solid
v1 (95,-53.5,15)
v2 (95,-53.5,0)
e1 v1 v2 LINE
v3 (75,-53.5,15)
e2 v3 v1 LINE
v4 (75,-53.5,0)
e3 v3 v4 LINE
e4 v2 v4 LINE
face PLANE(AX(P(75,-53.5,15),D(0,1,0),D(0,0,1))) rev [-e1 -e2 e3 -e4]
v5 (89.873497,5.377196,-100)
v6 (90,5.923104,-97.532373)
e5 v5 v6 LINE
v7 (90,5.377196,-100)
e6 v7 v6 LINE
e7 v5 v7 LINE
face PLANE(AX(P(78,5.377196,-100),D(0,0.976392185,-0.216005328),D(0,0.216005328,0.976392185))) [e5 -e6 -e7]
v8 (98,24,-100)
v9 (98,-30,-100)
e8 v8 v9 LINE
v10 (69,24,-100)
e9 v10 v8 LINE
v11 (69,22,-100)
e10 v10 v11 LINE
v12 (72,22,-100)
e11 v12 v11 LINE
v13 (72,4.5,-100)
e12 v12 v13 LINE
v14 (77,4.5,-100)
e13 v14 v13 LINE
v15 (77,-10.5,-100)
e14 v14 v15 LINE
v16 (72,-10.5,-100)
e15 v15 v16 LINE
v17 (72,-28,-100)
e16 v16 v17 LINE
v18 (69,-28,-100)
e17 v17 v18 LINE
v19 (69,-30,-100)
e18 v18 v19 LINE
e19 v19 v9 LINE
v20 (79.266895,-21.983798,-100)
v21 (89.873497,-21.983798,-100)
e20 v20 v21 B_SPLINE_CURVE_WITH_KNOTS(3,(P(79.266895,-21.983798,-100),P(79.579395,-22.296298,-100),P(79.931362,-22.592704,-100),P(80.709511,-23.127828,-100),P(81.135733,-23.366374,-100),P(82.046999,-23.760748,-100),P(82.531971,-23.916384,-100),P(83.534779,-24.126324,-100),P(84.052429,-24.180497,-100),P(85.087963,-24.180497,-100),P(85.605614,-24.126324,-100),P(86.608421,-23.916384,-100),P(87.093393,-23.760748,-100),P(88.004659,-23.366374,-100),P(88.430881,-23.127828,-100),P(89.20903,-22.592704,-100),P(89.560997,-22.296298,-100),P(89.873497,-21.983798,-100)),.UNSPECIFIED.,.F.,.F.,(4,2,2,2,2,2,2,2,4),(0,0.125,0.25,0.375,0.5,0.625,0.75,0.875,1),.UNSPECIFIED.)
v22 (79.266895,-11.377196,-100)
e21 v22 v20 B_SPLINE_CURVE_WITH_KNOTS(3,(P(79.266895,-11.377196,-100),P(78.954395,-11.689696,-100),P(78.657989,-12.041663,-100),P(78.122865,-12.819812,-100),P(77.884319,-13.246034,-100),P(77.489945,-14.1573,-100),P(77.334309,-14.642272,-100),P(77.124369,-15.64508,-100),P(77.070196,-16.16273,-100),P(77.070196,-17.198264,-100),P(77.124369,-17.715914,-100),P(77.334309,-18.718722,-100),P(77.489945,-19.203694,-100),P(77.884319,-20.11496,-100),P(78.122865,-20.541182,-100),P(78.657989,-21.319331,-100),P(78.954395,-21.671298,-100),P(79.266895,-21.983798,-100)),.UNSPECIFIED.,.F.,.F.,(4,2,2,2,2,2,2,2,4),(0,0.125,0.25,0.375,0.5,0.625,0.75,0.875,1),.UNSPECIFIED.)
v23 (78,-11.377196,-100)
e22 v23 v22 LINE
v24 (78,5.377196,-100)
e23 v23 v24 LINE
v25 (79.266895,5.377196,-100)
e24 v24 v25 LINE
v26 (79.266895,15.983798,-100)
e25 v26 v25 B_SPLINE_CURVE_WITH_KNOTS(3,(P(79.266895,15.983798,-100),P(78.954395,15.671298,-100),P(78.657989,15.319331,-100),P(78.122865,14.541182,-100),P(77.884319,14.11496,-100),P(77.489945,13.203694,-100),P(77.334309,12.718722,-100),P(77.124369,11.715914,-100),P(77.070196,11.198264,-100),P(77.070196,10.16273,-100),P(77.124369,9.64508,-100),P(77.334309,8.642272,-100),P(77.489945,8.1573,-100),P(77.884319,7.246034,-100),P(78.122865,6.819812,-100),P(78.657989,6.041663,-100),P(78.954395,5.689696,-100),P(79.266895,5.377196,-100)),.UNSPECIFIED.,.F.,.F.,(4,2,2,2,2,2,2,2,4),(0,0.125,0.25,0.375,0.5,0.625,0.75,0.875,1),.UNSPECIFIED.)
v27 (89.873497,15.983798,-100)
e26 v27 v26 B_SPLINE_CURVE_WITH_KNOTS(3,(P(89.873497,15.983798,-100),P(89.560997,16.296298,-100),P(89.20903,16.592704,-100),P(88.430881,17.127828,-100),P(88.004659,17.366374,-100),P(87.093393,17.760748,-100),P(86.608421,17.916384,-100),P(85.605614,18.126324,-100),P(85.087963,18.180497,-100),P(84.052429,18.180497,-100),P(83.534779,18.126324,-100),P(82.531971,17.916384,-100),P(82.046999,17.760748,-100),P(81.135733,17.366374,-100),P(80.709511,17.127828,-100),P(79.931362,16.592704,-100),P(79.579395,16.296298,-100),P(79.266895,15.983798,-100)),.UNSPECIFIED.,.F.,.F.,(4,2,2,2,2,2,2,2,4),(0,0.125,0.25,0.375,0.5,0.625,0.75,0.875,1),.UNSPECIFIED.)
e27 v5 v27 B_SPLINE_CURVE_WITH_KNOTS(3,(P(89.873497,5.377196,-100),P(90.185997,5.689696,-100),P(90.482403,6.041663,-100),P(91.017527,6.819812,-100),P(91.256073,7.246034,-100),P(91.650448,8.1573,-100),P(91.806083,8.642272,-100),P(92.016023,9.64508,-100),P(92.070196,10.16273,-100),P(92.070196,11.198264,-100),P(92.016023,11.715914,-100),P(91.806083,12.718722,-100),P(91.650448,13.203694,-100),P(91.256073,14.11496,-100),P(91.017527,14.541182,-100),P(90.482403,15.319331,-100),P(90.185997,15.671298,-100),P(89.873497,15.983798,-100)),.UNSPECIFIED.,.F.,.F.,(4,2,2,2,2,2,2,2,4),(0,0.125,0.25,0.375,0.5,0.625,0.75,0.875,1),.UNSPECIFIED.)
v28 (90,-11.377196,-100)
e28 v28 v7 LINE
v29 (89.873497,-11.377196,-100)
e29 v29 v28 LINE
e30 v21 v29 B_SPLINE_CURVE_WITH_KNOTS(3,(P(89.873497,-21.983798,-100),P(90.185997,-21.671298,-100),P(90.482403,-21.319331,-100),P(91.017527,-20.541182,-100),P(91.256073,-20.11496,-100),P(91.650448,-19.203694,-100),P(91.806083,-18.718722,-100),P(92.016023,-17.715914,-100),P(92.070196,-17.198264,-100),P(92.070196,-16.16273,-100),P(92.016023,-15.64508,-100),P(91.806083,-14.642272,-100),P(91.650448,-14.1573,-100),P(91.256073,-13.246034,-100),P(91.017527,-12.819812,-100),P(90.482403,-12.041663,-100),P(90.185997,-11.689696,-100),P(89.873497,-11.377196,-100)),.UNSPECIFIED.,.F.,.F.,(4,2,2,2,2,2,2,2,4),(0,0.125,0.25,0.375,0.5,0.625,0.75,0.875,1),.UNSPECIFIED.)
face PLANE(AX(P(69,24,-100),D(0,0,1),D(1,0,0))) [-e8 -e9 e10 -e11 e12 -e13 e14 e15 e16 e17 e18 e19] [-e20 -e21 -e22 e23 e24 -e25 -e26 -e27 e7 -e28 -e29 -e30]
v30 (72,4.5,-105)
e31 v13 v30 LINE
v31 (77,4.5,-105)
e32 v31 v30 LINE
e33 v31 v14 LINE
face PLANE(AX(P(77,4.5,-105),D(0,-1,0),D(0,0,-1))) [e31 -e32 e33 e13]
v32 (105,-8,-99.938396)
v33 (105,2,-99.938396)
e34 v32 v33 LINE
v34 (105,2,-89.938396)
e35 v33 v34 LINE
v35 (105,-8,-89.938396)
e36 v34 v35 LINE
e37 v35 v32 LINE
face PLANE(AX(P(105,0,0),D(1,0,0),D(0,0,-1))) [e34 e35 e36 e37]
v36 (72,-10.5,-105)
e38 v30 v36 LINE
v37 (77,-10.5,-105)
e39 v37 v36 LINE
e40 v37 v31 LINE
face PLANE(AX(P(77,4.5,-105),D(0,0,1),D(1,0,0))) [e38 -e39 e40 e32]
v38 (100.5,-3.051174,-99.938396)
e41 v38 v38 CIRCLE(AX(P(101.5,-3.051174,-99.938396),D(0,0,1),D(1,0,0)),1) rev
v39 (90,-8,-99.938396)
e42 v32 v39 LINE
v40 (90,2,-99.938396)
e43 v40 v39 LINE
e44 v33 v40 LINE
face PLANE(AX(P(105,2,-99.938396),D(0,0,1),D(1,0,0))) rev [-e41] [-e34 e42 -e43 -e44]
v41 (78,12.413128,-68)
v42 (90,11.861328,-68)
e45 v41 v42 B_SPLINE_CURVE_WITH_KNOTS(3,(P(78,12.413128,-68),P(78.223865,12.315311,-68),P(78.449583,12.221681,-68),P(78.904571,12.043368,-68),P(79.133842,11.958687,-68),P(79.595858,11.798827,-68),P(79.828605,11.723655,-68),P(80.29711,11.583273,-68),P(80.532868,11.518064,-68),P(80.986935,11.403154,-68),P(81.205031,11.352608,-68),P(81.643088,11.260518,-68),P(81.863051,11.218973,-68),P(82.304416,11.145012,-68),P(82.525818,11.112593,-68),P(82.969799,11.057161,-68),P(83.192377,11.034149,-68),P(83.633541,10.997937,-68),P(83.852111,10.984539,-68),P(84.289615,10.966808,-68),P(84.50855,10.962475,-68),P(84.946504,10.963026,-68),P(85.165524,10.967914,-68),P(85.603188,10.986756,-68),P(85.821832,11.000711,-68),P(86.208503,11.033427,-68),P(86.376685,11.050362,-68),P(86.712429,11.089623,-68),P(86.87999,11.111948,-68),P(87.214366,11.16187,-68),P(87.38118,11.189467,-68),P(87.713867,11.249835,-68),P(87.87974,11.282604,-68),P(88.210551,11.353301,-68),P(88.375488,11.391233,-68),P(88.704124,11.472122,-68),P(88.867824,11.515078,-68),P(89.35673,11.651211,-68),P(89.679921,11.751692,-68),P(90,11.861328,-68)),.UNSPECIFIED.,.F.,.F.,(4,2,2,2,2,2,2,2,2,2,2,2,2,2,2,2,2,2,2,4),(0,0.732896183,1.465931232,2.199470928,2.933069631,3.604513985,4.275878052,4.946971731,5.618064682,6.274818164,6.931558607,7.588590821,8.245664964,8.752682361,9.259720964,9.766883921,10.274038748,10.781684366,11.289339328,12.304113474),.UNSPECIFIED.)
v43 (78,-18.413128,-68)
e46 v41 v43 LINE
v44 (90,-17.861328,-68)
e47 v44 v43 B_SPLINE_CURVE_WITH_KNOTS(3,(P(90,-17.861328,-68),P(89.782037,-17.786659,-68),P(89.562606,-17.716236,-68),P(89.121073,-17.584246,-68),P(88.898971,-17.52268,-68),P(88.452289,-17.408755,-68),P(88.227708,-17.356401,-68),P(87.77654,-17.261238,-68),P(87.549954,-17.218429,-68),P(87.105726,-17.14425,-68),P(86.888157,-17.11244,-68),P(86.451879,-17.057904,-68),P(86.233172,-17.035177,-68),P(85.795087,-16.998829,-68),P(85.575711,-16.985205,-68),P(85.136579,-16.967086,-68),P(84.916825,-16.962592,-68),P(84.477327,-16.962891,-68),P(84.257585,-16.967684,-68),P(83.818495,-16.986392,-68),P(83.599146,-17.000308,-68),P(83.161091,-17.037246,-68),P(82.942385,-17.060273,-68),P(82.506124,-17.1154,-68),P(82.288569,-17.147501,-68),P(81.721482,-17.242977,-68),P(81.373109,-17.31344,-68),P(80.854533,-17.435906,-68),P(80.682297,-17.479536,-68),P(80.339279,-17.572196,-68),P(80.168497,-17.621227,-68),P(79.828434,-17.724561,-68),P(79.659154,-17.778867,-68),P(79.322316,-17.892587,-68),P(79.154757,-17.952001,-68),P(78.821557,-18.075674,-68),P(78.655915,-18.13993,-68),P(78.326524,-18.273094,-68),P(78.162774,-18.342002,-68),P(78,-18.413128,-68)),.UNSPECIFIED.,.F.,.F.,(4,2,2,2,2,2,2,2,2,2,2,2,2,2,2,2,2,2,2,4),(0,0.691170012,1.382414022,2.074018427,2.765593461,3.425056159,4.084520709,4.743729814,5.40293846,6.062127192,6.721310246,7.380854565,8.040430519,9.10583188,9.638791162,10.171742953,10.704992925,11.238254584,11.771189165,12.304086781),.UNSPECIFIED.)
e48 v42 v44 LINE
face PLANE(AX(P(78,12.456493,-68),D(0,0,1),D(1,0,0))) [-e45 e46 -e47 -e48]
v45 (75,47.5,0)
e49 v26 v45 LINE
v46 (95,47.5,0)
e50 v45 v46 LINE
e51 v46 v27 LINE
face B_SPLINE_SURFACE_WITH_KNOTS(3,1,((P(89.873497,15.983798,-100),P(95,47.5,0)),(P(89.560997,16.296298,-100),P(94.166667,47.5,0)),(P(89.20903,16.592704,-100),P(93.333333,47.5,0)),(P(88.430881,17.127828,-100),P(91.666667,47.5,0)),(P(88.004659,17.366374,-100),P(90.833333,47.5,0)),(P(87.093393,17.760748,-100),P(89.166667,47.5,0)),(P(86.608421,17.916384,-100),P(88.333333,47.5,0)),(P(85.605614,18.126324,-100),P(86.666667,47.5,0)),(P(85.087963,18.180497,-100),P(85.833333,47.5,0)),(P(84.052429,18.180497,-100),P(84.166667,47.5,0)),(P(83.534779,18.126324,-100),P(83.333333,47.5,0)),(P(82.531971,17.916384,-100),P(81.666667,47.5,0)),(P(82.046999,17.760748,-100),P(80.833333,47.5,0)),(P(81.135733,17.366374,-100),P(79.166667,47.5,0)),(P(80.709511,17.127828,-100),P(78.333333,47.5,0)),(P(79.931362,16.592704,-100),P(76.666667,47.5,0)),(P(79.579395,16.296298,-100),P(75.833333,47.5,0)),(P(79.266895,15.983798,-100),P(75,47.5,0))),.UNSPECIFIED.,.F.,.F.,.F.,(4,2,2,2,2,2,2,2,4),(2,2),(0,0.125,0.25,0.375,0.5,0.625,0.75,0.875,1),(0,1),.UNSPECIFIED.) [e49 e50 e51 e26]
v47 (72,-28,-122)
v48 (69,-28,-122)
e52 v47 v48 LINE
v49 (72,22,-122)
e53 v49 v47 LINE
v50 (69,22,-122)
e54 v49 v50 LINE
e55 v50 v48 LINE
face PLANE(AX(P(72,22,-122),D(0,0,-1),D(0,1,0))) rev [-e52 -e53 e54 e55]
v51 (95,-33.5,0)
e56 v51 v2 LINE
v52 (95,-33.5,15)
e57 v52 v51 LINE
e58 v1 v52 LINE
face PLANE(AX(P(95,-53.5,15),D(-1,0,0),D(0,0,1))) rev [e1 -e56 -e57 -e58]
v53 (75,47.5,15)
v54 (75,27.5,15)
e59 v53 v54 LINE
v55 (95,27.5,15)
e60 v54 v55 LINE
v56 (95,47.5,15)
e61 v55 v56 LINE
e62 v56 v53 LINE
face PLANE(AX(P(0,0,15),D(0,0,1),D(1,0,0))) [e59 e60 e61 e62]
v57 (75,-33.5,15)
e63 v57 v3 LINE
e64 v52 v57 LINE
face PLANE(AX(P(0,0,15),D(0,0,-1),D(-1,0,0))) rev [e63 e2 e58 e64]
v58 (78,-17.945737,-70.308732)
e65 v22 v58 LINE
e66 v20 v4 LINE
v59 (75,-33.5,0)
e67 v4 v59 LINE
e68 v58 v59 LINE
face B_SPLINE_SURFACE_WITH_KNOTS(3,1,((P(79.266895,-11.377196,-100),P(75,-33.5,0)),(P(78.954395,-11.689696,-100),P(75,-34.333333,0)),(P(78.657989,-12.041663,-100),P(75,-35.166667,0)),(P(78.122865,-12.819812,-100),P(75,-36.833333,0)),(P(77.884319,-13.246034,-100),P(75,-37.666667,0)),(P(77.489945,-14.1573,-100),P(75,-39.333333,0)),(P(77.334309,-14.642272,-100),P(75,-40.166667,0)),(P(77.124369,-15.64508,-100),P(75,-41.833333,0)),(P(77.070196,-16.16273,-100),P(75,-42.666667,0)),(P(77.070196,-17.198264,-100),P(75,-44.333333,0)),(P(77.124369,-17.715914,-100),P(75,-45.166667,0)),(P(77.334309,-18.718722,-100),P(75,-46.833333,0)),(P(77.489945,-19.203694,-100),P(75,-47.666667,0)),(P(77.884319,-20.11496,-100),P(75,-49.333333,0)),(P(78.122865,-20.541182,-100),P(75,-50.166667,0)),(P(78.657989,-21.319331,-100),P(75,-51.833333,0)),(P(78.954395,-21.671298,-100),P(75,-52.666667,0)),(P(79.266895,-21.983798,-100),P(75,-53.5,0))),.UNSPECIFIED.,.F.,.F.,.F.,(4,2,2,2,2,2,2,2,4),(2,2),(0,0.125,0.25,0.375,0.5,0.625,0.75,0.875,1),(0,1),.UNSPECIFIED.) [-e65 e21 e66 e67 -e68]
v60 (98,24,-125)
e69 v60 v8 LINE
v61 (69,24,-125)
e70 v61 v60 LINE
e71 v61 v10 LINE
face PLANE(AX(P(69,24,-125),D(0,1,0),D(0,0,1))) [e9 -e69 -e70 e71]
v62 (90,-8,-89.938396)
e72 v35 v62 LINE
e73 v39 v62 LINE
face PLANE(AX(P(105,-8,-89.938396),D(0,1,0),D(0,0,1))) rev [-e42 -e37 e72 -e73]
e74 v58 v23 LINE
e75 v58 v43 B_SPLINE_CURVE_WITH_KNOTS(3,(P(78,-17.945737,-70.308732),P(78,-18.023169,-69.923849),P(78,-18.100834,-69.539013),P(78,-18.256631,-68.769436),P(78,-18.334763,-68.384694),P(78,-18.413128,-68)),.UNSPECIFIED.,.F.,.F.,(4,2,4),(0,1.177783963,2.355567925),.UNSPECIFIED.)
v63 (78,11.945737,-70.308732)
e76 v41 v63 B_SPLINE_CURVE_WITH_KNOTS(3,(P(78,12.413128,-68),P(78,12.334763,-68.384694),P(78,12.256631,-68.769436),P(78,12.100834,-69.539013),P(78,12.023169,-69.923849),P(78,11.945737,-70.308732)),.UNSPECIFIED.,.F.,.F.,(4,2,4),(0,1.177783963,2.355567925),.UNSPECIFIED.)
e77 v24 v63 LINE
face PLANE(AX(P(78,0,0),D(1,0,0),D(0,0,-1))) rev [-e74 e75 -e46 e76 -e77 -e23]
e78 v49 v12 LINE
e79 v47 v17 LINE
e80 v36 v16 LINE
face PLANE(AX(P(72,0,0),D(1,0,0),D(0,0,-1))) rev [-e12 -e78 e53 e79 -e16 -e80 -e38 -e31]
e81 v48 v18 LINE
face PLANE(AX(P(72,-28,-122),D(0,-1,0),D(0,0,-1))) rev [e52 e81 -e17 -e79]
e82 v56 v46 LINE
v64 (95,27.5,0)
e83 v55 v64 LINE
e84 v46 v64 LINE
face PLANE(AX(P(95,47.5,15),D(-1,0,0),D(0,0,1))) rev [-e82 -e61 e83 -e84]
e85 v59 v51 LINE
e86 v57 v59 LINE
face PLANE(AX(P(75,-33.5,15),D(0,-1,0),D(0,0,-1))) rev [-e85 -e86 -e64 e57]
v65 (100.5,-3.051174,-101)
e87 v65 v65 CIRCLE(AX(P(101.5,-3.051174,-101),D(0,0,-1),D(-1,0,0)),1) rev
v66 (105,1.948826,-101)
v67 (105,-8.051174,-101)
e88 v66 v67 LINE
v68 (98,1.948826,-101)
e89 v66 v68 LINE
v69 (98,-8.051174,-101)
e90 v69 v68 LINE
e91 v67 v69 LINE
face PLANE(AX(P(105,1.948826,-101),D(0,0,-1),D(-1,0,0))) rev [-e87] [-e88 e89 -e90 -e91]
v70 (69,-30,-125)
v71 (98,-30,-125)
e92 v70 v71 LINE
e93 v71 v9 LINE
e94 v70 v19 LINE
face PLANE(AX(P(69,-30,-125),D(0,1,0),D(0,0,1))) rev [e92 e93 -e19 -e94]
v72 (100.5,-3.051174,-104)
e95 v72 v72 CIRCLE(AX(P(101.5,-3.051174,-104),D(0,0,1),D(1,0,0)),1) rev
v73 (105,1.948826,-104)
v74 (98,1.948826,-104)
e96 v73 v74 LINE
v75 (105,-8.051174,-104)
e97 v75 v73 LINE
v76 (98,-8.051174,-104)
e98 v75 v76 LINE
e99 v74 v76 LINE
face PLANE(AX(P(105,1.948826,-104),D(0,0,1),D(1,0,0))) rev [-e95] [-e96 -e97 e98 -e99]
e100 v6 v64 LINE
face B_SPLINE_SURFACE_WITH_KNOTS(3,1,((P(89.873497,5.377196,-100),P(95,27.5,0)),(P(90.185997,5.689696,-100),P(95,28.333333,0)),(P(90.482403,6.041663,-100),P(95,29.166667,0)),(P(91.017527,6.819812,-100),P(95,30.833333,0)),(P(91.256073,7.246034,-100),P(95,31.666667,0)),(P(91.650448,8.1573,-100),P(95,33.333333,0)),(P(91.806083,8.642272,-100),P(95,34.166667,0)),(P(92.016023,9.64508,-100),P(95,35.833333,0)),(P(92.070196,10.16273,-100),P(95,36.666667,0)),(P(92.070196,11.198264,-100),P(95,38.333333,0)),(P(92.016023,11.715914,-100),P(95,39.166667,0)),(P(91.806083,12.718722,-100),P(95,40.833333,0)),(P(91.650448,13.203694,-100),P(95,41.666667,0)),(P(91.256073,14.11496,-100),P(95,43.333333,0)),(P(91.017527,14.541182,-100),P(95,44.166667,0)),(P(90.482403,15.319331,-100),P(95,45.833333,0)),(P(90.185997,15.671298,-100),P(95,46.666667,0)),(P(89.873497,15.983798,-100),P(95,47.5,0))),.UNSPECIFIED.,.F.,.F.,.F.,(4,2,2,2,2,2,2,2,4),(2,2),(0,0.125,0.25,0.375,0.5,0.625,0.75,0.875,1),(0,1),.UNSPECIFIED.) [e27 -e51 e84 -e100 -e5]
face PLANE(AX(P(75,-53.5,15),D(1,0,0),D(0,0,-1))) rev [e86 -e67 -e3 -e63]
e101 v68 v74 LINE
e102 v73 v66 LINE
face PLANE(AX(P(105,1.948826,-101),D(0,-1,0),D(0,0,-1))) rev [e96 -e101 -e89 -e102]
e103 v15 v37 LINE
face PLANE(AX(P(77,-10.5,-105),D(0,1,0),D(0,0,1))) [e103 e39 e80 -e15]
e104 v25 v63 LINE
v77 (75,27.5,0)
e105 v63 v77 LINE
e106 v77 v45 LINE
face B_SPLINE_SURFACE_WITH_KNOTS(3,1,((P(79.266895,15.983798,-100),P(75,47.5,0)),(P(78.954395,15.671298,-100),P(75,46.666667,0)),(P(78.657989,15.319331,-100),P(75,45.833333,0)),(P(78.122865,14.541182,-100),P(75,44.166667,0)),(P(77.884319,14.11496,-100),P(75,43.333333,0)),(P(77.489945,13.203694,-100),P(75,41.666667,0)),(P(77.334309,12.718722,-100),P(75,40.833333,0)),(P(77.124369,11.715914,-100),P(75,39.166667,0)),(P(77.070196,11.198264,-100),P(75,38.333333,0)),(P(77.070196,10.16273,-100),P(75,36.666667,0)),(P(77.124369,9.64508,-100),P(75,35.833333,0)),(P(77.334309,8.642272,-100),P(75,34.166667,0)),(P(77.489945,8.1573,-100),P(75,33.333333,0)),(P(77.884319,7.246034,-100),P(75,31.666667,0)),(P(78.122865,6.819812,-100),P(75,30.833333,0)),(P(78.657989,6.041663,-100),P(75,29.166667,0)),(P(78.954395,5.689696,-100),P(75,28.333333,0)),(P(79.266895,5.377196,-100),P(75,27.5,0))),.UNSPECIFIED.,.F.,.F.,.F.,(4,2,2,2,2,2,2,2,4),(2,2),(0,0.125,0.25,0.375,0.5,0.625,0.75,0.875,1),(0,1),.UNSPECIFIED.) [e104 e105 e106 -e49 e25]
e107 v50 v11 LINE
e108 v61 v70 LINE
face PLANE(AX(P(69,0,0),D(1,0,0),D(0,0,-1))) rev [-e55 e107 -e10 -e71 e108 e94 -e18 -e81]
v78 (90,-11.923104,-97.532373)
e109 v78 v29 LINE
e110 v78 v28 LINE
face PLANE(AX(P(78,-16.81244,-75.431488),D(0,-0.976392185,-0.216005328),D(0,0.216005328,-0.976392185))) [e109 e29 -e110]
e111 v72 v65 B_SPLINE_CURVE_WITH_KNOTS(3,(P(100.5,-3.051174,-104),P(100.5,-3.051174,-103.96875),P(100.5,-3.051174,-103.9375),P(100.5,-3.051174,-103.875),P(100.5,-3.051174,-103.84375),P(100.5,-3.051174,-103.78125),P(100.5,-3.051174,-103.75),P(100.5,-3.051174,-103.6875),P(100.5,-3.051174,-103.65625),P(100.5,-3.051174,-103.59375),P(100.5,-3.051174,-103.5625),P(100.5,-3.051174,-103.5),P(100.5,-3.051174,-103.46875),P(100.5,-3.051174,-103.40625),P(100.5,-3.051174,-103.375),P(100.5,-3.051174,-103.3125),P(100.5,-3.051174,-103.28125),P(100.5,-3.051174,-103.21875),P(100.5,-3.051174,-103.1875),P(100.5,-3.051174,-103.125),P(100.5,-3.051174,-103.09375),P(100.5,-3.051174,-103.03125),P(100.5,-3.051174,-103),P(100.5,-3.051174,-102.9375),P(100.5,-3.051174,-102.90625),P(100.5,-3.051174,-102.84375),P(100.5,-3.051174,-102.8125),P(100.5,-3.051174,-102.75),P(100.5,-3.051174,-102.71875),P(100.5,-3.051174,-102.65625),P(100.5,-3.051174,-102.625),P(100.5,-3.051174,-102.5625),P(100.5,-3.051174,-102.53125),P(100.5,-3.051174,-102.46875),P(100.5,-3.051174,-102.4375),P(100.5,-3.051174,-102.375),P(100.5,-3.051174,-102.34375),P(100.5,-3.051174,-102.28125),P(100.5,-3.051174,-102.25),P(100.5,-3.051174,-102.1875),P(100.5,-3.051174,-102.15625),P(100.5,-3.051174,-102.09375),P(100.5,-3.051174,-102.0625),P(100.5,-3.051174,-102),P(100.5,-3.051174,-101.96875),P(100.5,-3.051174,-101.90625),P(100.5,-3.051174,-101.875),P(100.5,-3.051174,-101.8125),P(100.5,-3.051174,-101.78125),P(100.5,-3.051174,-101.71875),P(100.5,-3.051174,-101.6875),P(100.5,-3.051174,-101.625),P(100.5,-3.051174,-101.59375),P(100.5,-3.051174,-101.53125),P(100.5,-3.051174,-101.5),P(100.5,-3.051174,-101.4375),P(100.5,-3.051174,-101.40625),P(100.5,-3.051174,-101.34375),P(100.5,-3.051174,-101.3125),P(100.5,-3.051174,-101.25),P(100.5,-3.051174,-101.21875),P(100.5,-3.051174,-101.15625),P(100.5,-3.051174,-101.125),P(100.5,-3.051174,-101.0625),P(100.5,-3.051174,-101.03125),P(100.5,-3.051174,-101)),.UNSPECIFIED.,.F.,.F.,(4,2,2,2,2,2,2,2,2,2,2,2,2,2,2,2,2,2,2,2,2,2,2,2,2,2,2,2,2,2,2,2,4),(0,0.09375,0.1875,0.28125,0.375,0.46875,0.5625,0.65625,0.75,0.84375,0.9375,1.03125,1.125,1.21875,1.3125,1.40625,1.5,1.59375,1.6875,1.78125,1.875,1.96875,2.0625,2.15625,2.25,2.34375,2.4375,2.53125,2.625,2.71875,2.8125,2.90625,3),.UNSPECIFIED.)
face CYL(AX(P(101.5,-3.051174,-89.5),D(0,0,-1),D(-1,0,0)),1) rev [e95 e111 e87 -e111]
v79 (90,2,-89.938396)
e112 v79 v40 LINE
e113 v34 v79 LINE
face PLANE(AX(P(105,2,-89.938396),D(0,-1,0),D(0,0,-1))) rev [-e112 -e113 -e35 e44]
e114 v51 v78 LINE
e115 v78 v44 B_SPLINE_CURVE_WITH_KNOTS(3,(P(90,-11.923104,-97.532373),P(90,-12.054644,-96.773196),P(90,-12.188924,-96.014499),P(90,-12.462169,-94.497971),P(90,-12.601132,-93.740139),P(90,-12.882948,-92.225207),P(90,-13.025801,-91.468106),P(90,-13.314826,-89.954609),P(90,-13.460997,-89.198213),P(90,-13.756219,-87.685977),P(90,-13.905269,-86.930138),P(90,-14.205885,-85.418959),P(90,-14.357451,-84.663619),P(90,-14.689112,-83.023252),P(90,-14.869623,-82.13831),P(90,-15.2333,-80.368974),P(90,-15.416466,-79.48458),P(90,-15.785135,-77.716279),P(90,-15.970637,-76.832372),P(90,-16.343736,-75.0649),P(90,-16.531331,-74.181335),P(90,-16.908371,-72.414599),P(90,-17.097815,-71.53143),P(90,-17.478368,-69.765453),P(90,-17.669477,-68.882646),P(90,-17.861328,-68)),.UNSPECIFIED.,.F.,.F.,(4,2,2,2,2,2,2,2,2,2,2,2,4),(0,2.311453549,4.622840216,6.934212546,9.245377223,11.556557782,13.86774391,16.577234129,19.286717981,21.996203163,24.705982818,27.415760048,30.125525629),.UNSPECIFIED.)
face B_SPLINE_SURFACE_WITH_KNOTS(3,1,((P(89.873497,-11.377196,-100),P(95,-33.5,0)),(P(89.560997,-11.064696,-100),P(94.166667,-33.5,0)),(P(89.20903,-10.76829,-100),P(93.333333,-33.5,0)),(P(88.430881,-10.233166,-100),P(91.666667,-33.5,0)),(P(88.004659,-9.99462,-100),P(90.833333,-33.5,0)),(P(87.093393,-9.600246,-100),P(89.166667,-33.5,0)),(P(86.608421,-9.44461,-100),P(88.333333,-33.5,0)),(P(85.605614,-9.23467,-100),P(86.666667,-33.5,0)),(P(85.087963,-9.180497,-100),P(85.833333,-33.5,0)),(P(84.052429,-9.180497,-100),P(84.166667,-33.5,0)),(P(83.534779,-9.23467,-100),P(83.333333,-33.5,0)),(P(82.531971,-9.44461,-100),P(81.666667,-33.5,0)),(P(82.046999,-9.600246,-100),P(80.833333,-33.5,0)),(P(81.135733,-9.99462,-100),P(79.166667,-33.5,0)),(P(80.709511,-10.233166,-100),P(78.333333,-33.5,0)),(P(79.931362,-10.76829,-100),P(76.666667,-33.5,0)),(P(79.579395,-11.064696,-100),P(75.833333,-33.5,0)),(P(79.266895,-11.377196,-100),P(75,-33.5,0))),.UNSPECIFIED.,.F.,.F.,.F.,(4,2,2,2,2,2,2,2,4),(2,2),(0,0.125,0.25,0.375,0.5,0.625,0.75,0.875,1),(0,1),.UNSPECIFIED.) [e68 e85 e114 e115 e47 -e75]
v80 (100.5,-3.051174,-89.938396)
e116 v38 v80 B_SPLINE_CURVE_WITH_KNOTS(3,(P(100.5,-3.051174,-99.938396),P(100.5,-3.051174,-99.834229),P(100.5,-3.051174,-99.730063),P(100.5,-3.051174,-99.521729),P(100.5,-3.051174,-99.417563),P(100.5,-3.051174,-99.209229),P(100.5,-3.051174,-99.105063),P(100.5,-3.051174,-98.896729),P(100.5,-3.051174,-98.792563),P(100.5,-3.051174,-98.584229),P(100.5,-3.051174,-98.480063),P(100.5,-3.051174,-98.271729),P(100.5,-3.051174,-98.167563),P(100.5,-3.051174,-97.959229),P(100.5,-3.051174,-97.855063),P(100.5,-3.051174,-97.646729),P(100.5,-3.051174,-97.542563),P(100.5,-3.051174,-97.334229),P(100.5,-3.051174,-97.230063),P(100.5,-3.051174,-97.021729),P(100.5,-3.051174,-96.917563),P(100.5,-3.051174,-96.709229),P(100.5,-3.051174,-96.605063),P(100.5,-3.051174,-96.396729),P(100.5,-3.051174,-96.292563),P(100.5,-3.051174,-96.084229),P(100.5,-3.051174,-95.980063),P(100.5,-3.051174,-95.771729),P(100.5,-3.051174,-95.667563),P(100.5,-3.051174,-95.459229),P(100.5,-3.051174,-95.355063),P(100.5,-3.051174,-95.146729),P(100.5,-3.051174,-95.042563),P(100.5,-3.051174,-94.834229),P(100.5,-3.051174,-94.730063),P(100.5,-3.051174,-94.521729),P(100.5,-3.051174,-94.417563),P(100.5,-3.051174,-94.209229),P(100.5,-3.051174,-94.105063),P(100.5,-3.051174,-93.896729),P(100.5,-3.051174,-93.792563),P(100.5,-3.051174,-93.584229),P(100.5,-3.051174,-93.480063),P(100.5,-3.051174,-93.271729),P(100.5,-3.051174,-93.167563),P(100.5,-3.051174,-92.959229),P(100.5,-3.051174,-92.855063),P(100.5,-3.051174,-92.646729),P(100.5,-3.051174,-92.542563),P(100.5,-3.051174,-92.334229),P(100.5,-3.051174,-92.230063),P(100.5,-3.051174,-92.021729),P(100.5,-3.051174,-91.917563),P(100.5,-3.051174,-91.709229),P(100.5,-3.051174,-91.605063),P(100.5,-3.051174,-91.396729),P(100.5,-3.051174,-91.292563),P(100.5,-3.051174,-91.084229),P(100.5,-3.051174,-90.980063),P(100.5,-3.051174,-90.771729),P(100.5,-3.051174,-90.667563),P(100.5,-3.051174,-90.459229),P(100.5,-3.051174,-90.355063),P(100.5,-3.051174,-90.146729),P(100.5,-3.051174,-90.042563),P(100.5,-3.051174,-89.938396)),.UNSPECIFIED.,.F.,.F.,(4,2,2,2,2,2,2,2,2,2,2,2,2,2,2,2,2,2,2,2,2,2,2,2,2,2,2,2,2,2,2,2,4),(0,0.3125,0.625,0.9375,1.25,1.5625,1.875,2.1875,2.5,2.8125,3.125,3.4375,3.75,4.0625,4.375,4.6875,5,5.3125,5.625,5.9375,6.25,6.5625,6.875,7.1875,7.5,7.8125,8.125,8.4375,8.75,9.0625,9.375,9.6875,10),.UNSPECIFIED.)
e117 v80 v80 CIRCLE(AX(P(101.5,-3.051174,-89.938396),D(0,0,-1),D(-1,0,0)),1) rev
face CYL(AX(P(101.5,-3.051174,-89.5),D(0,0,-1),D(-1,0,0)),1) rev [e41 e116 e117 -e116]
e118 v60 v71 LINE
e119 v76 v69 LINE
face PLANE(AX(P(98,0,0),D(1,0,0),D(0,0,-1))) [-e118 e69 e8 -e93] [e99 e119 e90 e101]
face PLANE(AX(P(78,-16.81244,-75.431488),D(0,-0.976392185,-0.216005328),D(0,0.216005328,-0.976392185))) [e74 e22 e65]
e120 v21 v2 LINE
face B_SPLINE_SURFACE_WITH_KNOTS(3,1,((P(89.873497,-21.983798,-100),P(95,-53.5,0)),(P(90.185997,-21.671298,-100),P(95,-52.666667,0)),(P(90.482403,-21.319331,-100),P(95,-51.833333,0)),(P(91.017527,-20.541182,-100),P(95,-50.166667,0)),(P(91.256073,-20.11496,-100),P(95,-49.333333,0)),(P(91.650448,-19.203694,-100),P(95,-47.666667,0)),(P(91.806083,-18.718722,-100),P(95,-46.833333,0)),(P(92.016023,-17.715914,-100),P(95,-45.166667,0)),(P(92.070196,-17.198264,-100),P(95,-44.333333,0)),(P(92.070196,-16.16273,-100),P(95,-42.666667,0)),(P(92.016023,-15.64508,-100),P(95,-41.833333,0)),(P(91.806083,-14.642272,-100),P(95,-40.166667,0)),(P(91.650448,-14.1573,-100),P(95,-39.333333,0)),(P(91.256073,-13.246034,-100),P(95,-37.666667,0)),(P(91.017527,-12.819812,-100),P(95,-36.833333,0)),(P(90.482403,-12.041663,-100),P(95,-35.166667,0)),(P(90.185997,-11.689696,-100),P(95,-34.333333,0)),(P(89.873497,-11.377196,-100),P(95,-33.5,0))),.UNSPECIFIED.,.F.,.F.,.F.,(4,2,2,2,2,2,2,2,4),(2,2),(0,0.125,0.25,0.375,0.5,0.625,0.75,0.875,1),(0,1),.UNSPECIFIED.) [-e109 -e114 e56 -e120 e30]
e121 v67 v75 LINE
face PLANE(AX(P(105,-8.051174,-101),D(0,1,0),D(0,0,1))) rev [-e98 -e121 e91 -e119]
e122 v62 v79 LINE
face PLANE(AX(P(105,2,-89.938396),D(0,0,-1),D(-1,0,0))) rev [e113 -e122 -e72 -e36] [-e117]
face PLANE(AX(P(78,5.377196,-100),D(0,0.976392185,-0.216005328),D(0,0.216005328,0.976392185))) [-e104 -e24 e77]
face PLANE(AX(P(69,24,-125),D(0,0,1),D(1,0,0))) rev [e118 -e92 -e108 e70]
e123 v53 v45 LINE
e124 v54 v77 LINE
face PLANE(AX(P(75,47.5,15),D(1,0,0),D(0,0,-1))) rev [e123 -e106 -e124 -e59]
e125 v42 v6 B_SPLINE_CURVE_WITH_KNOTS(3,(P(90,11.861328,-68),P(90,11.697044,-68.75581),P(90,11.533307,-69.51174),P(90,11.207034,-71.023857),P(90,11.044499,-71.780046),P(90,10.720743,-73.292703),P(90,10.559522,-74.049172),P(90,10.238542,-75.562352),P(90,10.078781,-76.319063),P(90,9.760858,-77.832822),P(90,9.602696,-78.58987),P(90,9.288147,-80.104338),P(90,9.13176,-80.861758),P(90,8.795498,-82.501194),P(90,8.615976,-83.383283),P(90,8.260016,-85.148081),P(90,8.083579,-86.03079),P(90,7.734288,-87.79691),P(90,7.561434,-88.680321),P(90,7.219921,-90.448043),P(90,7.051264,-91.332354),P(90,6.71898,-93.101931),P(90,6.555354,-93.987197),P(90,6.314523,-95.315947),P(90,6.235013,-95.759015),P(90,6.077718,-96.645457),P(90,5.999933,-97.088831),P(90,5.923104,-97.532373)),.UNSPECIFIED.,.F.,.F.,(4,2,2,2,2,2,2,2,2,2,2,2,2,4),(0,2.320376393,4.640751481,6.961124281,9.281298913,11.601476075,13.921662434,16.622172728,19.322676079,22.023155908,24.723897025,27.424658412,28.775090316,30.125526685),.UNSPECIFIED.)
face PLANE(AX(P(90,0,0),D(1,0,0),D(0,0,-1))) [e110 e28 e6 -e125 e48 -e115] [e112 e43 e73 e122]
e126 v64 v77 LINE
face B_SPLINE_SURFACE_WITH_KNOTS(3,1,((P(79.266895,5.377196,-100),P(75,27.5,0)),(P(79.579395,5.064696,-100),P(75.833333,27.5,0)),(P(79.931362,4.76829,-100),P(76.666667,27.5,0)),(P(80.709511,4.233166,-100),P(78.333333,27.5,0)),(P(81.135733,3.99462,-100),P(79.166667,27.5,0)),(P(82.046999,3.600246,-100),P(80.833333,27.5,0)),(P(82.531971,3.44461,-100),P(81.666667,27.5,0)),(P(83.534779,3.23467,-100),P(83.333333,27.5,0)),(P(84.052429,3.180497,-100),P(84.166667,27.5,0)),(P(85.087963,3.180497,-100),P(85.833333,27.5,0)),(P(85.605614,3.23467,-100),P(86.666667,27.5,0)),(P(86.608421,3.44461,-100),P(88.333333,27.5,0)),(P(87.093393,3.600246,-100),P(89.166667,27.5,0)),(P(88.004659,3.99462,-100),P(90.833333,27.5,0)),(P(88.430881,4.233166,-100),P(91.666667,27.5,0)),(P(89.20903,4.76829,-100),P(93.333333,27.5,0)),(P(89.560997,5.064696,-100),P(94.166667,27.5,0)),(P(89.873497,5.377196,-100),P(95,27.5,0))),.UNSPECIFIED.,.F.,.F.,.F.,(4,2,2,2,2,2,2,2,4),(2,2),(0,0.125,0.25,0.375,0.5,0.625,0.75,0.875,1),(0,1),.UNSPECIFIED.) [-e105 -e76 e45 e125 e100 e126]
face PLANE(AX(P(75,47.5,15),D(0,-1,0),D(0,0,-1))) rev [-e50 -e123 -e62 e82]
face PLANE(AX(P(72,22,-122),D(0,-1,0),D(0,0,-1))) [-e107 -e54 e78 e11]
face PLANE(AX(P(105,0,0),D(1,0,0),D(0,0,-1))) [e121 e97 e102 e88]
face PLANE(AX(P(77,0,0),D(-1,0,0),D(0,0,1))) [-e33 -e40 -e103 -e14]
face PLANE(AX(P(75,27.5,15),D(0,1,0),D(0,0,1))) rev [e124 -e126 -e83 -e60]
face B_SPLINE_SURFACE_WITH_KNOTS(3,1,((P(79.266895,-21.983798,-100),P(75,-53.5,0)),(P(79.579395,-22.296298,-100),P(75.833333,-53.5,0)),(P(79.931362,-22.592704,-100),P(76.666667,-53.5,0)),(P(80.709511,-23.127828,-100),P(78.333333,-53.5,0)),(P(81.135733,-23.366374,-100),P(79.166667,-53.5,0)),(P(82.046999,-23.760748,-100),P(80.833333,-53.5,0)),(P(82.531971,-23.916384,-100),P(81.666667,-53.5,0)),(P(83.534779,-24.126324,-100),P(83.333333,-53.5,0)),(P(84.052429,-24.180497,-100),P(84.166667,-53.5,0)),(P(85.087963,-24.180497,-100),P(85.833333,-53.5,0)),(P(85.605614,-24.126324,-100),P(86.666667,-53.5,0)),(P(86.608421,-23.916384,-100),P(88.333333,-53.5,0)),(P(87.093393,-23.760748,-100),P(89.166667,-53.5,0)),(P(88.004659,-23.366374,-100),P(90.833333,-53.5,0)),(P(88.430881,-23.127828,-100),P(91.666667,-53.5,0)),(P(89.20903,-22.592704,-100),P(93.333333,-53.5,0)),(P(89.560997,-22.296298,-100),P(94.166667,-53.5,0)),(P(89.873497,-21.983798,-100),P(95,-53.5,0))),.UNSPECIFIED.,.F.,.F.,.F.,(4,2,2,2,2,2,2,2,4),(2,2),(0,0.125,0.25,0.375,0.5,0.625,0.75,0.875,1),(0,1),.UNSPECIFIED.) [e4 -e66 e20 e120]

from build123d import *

# Parameters (mm, degrees)
EXTRUDE_6_DEPTH           = 3
EXTRUDE_6_DEPTH_BACK      = 26
SKETCH_13_W               = 25
SKETCH_13_H               = 54
SKETCH_16_W               = 22
SKETCH_16_H               = 50
CUT_EXTRUDE_9_DEPTH       = 3
SKETCH_17_W               = 5
SKETCH_17_H               = 15
CUT_EXTRUDE_10_DEPTH      = 8
EXTRUDE_14_OUTLINE_W      = 20
EXTRUDE_14_OUTLINE_H      = 20
EXTRUDE_14_DEPTH          = 15
EXTRUDE_14_3_OUTLINE_W    = 20
EXTRUDE_14_3_OUTLINE_H    = 20
EXTRUDE_14_3_DEPTH        = 15
EXTRUDE_15_DEPTH          = 5
EXTRUDE_15_DEPTH_BACK     = 7
SKETCH_25_W               = 10
SKETCH_25_H               = 10
EXTRUDE_17_DEPTH          = 20
SKETCH_26_W               = 3
SKETCH_26_H               = 10
EXTRUDE_18_DEPTH          = 10
CUT_EXTRUDE_11_DEPTH      = 10.5
CUT_EXTRUDE_11_DEPTH_BACK = 10.5
SKETCH_28_R               = 1


with BuildPart() as part:
    # 草圖13 → 填料-伸長6 (new, two sides: drawn at the far end of the back side and taken through both)
    with BuildSketch(Plane(origin=(95, 0, 0), x_dir=(0, 0, -1), z_dir=(1, 0, 0)).offset(-EXTRUDE_6_DEPTH_BACK)):
        with Locations((112.5, -3)):
            Rectangle(SKETCH_13_W, SKETCH_13_H)
    extrude(amount=EXTRUDE_6_DEPTH + EXTRUDE_6_DEPTH_BACK)

    # 草圖16 → 除料-伸長9 (cut)
    with BuildSketch(Plane(origin=(69, 0, 0), x_dir=(0, 0, -1), z_dir=(1, 0, 0))):
        with Locations((111, -3)):
            Rectangle(SKETCH_16_W, SKETCH_16_H)
    extrude(amount=CUT_EXTRUDE_9_DEPTH, mode=Mode.SUBTRACT)

    # 草圖17 → 除料-伸長10 (cut)
    with BuildSketch(Plane(origin=(69, 0, 0), x_dir=(0, 0, -1), z_dir=(1, 0, 0))):
        with Locations((102.5, -3)):
            Rectangle(SKETCH_17_W, SKETCH_17_H)
    extrude(amount=CUT_EXTRUDE_10_DEPTH, mode=Mode.SUBTRACT)



with BuildPart() as body_2:
    # Knit 1: read off the stored shape, not the designer's step
    # Knit 1: loft between two sections, ruled curve by curve
    knit_1_from = [
        Edge.make_bspline([(79.266895317, 5.377196179, -100), (79.579395317, 5.064696179, -100), (79.931362244, 4.768290315, -100), (80.709511323, 4.233165726, -100), (81.135733214, 3.994620259, -100), (82.046998926, 3.600245646, -100), (82.531971403, 3.444609801, -100), (83.534778832, 3.234670337, -100), (84.052429223, 3.180497037, -100), (85.087963129, 3.180497037, -100), (85.60561352, 3.234670337, -100), (86.608420949, 3.444609801, -100), (87.093393426, 3.600245646, -100), (88.004659138, 3.994620259, -100), (88.430881029, 4.233165726, -100), (89.209030109, 4.768290315, -100), (89.560997035, 5.064696179, -100), (89.873497035, 5.377196179, -100)], [0, 0, 0, 0, 0.125, 0.125, 0.25, 0.25, 0.375, 0.375, 0.5, 0.5, 0.625, 0.625, 0.75, 0.75, 0.875, 0.875, 1, 1, 1, 1], 3),
        Edge.make_bspline([(89.873497035, 5.377196179, -100), (90.185997035, 5.689696179, -100), (90.482402899, 6.041663105, -100), (91.017527488, 6.819812184, -100), (91.256072955, 7.246034075, -100), (91.650447568, 8.157299787, -100), (91.806083413, 8.642272265, -100), (92.016022877, 9.645079694, -100), (92.070196176, 10.162730084, -100), (92.070196176, 11.19826399, -100), (92.016022877, 11.715914381, -100), (91.806083413, 12.71872181, -100), (91.650447568, 13.203694288, -100), (91.256072955, 14.11496, -100), (91.017527488, 14.541181891, -100), (90.482402899, 15.31933097, -100), (90.185997035, 15.671297896, -100), (89.873497035, 15.983797896, -100)], [0, 0, 0, 0, 0.125, 0.125, 0.25, 0.25, 0.375, 0.375, 0.5, 0.5, 0.625, 0.625, 0.75, 0.75, 0.875, 0.875, 1, 1, 1, 1], 3),
        Edge.make_bspline([(79.266895317, 15.983797896, -100), (78.954395317, 15.671297896, -100), (78.657989454, 15.31933097, -100), (78.122864864, 14.541181891, -100), (77.884319398, 14.11496, -100), (77.489944785, 13.203694288, -100), (77.334308939, 12.71872181, -100), (77.124369476, 11.715914381, -100), (77.070196176, 11.19826399, -100), (77.070196176, 10.162730084, -100), (77.124369476, 9.645079694, -100), (77.334308939, 8.642272265, -100), (77.489944785, 8.157299787, -100), (77.884319398, 7.246034075, -100), (78.122864864, 6.819812184, -100), (78.657989454, 6.041663105, -100), (78.954395317, 5.689696179, -100), (79.266895317, 5.377196179, -100)], [0, 0, 0, 0, 0.125, 0.125, 0.25, 0.25, 0.375, 0.375, 0.5, 0.5, 0.625, 0.625, 0.75, 0.75, 0.875, 0.875, 1, 1, 1, 1], 3),
        Edge.make_bspline([(89.873497035, 15.983797896, -100), (89.560997035, 16.296297896, -100), (89.209030109, 16.59270376, -100), (88.430881029, 17.127828349, -100), (88.004659138, 17.366373816, -100), (87.093393426, 17.760748429, -100), (86.608420949, 17.916384274, -100), (85.60561352, 18.126323738, -100), (85.087963129, 18.180497037, -100), (84.052429223, 18.180497037, -100), (83.534778832, 18.126323738, -100), (82.531971403, 17.916384274, -100), (82.046998926, 17.760748429, -100), (81.135733214, 17.366373816, -100), (80.709511323, 17.127828349, -100), (79.931362244, 16.59270376, -100), (79.579395317, 16.296297896, -100), (79.266895317, 15.983797896, -100)], [0, 0, 0, 0, 0.125, 0.125, 0.25, 0.25, 0.375, 0.375, 0.5, 0.5, 0.625, 0.625, 0.75, 0.75, 0.875, 0.875, 1, 1, 1, 1], 3),
    ]
    knit_1_to = [
        Edge.make_bspline([(75, 27.5, 0), (75.833333333, 27.5, 0), (76.666666667, 27.5, 0), (78.333333333, 27.5, 0), (79.166666667, 27.5, 0), (80.833333333, 27.5, 0), (81.666666667, 27.5, 0), (83.333333333, 27.5, 0), (84.166666667, 27.5, 0), (85.833333333, 27.5, 0), (86.666666667, 27.5, 0), (88.333333333, 27.5, 0), (89.166666667, 27.5, 0), (90.833333333, 27.5, 0), (91.666666667, 27.5, 0), (93.333333333, 27.5, 0), (94.166666667, 27.5, 0), (95, 27.5, 0)], [0, 0, 0, 0, 0.125, 0.125, 0.25, 0.25, 0.375, 0.375, 0.5, 0.5, 0.625, 0.625, 0.75, 0.75, 0.875, 0.875, 1, 1, 1, 1], 3),
        Edge.make_bspline([(95, 27.5, 0), (95, 28.333333333, 0), (95, 29.166666667, 0), (95, 30.833333333, 0), (95, 31.666666667, 0), (95, 33.333333333, 0), (95, 34.166666667, 0), (95, 35.833333333, 0), (95, 36.666666667, 0), (95, 38.333333333, 0), (95, 39.166666667, 0), (95, 40.833333333, 0), (95, 41.666666667, 0), (95, 43.333333333, 0), (95, 44.166666667, 0), (95, 45.833333333, 0), (95, 46.666666667, 0), (95, 47.5, 0)], [0, 0, 0, 0, 0.125, 0.125, 0.25, 0.25, 0.375, 0.375, 0.5, 0.5, 0.625, 0.625, 0.75, 0.75, 0.875, 0.875, 1, 1, 1, 1], 3),
        Edge.make_bspline([(75, 47.5, 0), (75, 46.666666667, 0), (75, 45.833333333, 0), (75, 44.166666667, 0), (75, 43.333333333, 0), (75, 41.666666667, 0), (75, 40.833333333, 0), (75, 39.166666667, 0), (75, 38.333333333, 0), (75, 36.666666667, 0), (75, 35.833333333, 0), (75, 34.166666667, 0), (75, 33.333333333, 0), (75, 31.666666667, 0), (75, 30.833333333, 0), (75, 29.166666667, 0), (75, 28.333333333, 0), (75, 27.5, 0)], [0, 0, 0, 0, 0.125, 0.125, 0.25, 0.25, 0.375, 0.375, 0.5, 0.5, 0.625, 0.625, 0.75, 0.75, 0.875, 0.875, 1, 1, 1, 1], 3),
        Edge.make_bspline([(95, 47.5, 0), (94.166666667, 47.5, 0), (93.333333333, 47.5, 0), (91.666666667, 47.5, 0), (90.833333333, 47.5, 0), (89.166666667, 47.5, 0), (88.333333333, 47.5, 0), (86.666666667, 47.5, 0), (85.833333333, 47.5, 0), (84.166666667, 47.5, 0), (83.333333333, 47.5, 0), (81.666666667, 47.5, 0), (80.833333333, 47.5, 0), (79.166666667, 47.5, 0), (78.333333333, 47.5, 0), (76.666666667, 47.5, 0), (75.833333333, 47.5, 0), (75, 47.5, 0)], [0, 0, 0, 0, 0.125, 0.125, 0.25, 0.25, 0.375, 0.375, 0.5, 0.5, 0.625, 0.625, 0.75, 0.75, 0.875, 0.875, 1, 1, 1, 1], 3),
    ]
    knit_1 = Solid(Shell([*[Face.make_surface_from_curves(knit_1_from[k], knit_1_to[k]) for k in range(4)], Face(Wire(knit_1_from)), Face(Wire(knit_1_to))]))
    add(knit_1)

    # Extrude 14 3 outline → Extrude 14 3 (add)
    with BuildSketch(Plane.XY):
        with Locations((85, 37.5)):
            Rectangle(EXTRUDE_14_3_OUTLINE_W, EXTRUDE_14_3_OUTLINE_H)
    extrude(amount=EXTRUDE_14_3_DEPTH)


with BuildPart() as body_3:
    # 填料-伸長14: read off the stored shape, not the designer's step
    # 填料-伸長14 outline → 填料-伸長14 (new body)
    with BuildSketch(Plane.XY):
        with Locations((85, -43.5)):
            Rectangle(EXTRUDE_14_OUTLINE_W, EXTRUDE_14_OUTLINE_H)
    extrude(amount=EXTRUDE_14_DEPTH)

    # Extrude 14 2: loft between two sections, ruled curve by curve
    extrude_14_2_from = [
        Edge.make_bspline([(79.266895317, -21.983797896, -100), (79.579395317, -22.296297896, -100), (79.931362244, -22.59270376, -100), (80.709511323, -23.127828349, -100), (81.135733214, -23.366373816, -100), (82.046998926, -23.760748429, -100), (82.531971403, -23.916384274, -100), (83.534778832, -24.126323738, -100), (84.052429223, -24.180497037, -100), (85.087963129, -24.180497037, -100), (85.60561352, -24.126323738, -100), (86.608420949, -23.916384274, -100), (87.093393426, -23.760748429, -100), (88.004659138, -23.366373816, -100), (88.430881029, -23.127828349, -100), (89.209030109, -22.59270376, -100), (89.560997035, -22.296297896, -100), (89.873497035, -21.983797896, -100)], [0, 0, 0, 0, 0.125, 0.125, 0.25, 0.25, 0.375, 0.375, 0.5, 0.5, 0.625, 0.625, 0.75, 0.75, 0.875, 0.875, 1, 1, 1, 1], 3),
        Edge.make_bspline([(89.873497035, -21.983797896, -100), (90.185997035, -21.671297896, -100), (90.482402899, -21.31933097, -100), (91.017527488, -20.541181891, -100), (91.256072955, -20.11496, -100), (91.650447568, -19.203694288, -100), (91.806083413, -18.71872181, -100), (92.016022877, -17.715914381, -100), (92.070196176, -17.19826399, -100), (92.070196176, -16.162730084, -100), (92.016022877, -15.645079694, -100), (91.806083413, -14.642272265, -100), (91.650447568, -14.157299787, -100), (91.256072955, -13.246034075, -100), (91.017527488, -12.819812184, -100), (90.482402899, -12.041663105, -100), (90.185997035, -11.689696179, -100), (89.873497035, -11.377196179, -100)], [0, 0, 0, 0, 0.125, 0.125, 0.25, 0.25, 0.375, 0.375, 0.5, 0.5, 0.625, 0.625, 0.75, 0.75, 0.875, 0.875, 1, 1, 1, 1], 3),
        Edge.make_bspline([(79.266895317, -11.377196179, -100), (78.954395317, -11.689696179, -100), (78.657989454, -12.041663105, -100), (78.122864864, -12.819812184, -100), (77.884319398, -13.246034075, -100), (77.489944785, -14.157299787, -100), (77.334308939, -14.642272265, -100), (77.124369476, -15.645079694, -100), (77.070196176, -16.162730084, -100), (77.070196176, -17.19826399, -100), (77.124369476, -17.715914381, -100), (77.334308939, -18.71872181, -100), (77.489944785, -19.203694288, -100), (77.884319398, -20.11496, -100), (78.122864864, -20.541181891, -100), (78.657989454, -21.31933097, -100), (78.954395317, -21.671297896, -100), (79.266895317, -21.983797896, -100)], [0, 0, 0, 0, 0.125, 0.125, 0.25, 0.25, 0.375, 0.375, 0.5, 0.5, 0.625, 0.625, 0.75, 0.75, 0.875, 0.875, 1, 1, 1, 1], 3),
        Edge.make_bspline([(89.873497035, -11.377196179, -100), (89.560997035, -11.064696179, -100), (89.209030109, -10.768290315, -100), (88.430881029, -10.233165726, -100), (88.004659138, -9.994620259, -100), (87.093393426, -9.600245646, -100), (86.608420949, -9.444609801, -100), (85.60561352, -9.234670337, -100), (85.087963129, -9.180497037, -100), (84.052429223, -9.180497037, -100), (83.534778832, -9.234670337, -100), (82.531971403, -9.444609801, -100), (82.046998926, -9.600245646, -100), (81.135733214, -9.994620259, -100), (80.709511323, -10.233165726, -100), (79.931362244, -10.768290315, -100), (79.579395317, -11.064696179, -100), (79.266895317, -11.377196179, -100)], [0, 0, 0, 0, 0.125, 0.125, 0.25, 0.25, 0.375, 0.375, 0.5, 0.5, 0.625, 0.625, 0.75, 0.75, 0.875, 0.875, 1, 1, 1, 1], 3),
    ]
    extrude_14_2_to = [
        Edge.make_bspline([(75, -53.5, 0), (75.833333333, -53.5, 0), (76.666666667, -53.5, 0), (78.333333333, -53.5, 0), (79.166666667, -53.5, 0), (80.833333333, -53.5, 0), (81.666666667, -53.5, 0), (83.333333333, -53.5, 0), (84.166666667, -53.5, 0), (85.833333333, -53.5, 0), (86.666666667, -53.5, 0), (88.333333333, -53.5, 0), (89.166666667, -53.5, 0), (90.833333333, -53.5, 0), (91.666666667, -53.5, 0), (93.333333333, -53.5, 0), (94.166666667, -53.5, 0), (95, -53.5, 0)], [0, 0, 0, 0, 0.125, 0.125, 0.25, 0.25, 0.375, 0.375, 0.5, 0.5, 0.625, 0.625, 0.75, 0.75, 0.875, 0.875, 1, 1, 1, 1], 3),
        Edge.make_bspline([(95, -53.5, 0), (95, -52.666666667, 0), (95, -51.833333333, 0), (95, -50.166666667, 0), (95, -49.333333333, 0), (95, -47.666666667, 0), (95, -46.833333333, 0), (95, -45.166666667, 0), (95, -44.333333333, 0), (95, -42.666666667, 0), (95, -41.833333333, 0), (95, -40.166666667, 0), (95, -39.333333333, 0), (95, -37.666666667, 0), (95, -36.833333333, 0), (95, -35.166666667, 0), (95, -34.333333333, 0), (95, -33.5, 0)], [0, 0, 0, 0, 0.125, 0.125, 0.25, 0.25, 0.375, 0.375, 0.5, 0.5, 0.625, 0.625, 0.75, 0.75, 0.875, 0.875, 1, 1, 1, 1], 3),
        Edge.make_bspline([(75, -33.5, 0), (75, -34.333333333, 0), (75, -35.166666667, 0), (75, -36.833333333, 0), (75, -37.666666667, 0), (75, -39.333333333, 0), (75, -40.166666667, 0), (75, -41.833333333, 0), (75, -42.666666667, 0), (75, -44.333333333, 0), (75, -45.166666667, 0), (75, -46.833333333, 0), (75, -47.666666667, 0), (75, -49.333333333, 0), (75, -50.166666667, 0), (75, -51.833333333, 0), (75, -52.666666667, 0), (75, -53.5, 0)], [0, 0, 0, 0, 0.125, 0.125, 0.25, 0.25, 0.375, 0.375, 0.5, 0.5, 0.625, 0.625, 0.75, 0.75, 0.875, 0.875, 1, 1, 1, 1], 3),
        Edge.make_bspline([(95, -33.5, 0), (94.166666667, -33.5, 0), (93.333333333, -33.5, 0), (91.666666667, -33.5, 0), (90.833333333, -33.5, 0), (89.166666667, -33.5, 0), (88.333333333, -33.5, 0), (86.666666667, -33.5, 0), (85.833333333, -33.5, 0), (84.166666667, -33.5, 0), (83.333333333, -33.5, 0), (81.666666667, -33.5, 0), (80.833333333, -33.5, 0), (79.166666667, -33.5, 0), (78.333333333, -33.5, 0), (76.666666667, -33.5, 0), (75.833333333, -33.5, 0), (75, -33.5, 0)], [0, 0, 0, 0, 0.125, 0.125, 0.25, 0.25, 0.375, 0.375, 0.5, 0.5, 0.625, 0.625, 0.75, 0.75, 0.875, 0.875, 1, 1, 1, 1], 3),
    ]
    extrude_14_2 = Solid(Shell([*[Face.make_surface_from_curves(extrude_14_2_from[k], extrude_14_2_to[k]) for k in range(4)], Face(Wire(extrude_14_2_from)), Face(Wire(extrude_14_2_to))]))
    add(extrude_14_2)


with BuildPart() as part_1:
    add(part.part)

    add(body_2.part)  # 填料-伸長15 merges body 2

    add(body_3.part)  # 填料-伸長15 merges body 3
    # 草圖23 → 填料-伸長15 (add, two sides: drawn at the far end of the back side and taken through both)
    with BuildSketch(Plane(origin=(85, 0, 0), x_dir=(0, 0, -1), z_dir=(1, 0, 0)).offset(-EXTRUDE_15_DEPTH_BACK)):
        Polygon((75.431487816, -16.812439931), (100, -11.377196179), (100, 3.180497037), (100, 5.377196179), (68, 12.456493401), (68, -18.456493401), align=None)
    extrude(amount=EXTRUDE_15_DEPTH + EXTRUDE_15_DEPTH_BACK)

    # 草圖25 → 填料-伸長17 (add)
    with BuildSketch(Plane(origin=(85, 0, 0), x_dir=(0, 0, -1), z_dir=(1, 0, 0))):
        with Locations((94.938395857, -3)):
            Rectangle(SKETCH_25_W, SKETCH_25_H)
    extrude(amount=EXTRUDE_17_DEPTH)

    # 草圖26 → 填料-伸長18 (add)
    with BuildSketch(Plane(origin=(95, 0, 0), x_dir=(0, 0, -1), z_dir=(1, 0, 0))):
        with Locations((102.5, -3.051173544)):
            Rectangle(SKETCH_26_W, SKETCH_26_H)
    extrude(amount=EXTRUDE_18_DEPTH)

    # 草圖28 → 除料-伸長11 (cut, two sides: drawn at the far end of the back side and taken through both)
    with BuildSketch(Plane.XY.offset(-100).offset(-CUT_EXTRUDE_11_DEPTH_BACK)):
        with Locations(Location((101.5, -3.051173544, 0), (0, 0, 180))):
            Circle(SKETCH_28_R)
    extrude(amount=CUT_EXTRUDE_11_DEPTH + CUT_EXTRUDE_11_DEPTH_BACK, mode=Mode.SUBTRACT)


solid = part_1.part
